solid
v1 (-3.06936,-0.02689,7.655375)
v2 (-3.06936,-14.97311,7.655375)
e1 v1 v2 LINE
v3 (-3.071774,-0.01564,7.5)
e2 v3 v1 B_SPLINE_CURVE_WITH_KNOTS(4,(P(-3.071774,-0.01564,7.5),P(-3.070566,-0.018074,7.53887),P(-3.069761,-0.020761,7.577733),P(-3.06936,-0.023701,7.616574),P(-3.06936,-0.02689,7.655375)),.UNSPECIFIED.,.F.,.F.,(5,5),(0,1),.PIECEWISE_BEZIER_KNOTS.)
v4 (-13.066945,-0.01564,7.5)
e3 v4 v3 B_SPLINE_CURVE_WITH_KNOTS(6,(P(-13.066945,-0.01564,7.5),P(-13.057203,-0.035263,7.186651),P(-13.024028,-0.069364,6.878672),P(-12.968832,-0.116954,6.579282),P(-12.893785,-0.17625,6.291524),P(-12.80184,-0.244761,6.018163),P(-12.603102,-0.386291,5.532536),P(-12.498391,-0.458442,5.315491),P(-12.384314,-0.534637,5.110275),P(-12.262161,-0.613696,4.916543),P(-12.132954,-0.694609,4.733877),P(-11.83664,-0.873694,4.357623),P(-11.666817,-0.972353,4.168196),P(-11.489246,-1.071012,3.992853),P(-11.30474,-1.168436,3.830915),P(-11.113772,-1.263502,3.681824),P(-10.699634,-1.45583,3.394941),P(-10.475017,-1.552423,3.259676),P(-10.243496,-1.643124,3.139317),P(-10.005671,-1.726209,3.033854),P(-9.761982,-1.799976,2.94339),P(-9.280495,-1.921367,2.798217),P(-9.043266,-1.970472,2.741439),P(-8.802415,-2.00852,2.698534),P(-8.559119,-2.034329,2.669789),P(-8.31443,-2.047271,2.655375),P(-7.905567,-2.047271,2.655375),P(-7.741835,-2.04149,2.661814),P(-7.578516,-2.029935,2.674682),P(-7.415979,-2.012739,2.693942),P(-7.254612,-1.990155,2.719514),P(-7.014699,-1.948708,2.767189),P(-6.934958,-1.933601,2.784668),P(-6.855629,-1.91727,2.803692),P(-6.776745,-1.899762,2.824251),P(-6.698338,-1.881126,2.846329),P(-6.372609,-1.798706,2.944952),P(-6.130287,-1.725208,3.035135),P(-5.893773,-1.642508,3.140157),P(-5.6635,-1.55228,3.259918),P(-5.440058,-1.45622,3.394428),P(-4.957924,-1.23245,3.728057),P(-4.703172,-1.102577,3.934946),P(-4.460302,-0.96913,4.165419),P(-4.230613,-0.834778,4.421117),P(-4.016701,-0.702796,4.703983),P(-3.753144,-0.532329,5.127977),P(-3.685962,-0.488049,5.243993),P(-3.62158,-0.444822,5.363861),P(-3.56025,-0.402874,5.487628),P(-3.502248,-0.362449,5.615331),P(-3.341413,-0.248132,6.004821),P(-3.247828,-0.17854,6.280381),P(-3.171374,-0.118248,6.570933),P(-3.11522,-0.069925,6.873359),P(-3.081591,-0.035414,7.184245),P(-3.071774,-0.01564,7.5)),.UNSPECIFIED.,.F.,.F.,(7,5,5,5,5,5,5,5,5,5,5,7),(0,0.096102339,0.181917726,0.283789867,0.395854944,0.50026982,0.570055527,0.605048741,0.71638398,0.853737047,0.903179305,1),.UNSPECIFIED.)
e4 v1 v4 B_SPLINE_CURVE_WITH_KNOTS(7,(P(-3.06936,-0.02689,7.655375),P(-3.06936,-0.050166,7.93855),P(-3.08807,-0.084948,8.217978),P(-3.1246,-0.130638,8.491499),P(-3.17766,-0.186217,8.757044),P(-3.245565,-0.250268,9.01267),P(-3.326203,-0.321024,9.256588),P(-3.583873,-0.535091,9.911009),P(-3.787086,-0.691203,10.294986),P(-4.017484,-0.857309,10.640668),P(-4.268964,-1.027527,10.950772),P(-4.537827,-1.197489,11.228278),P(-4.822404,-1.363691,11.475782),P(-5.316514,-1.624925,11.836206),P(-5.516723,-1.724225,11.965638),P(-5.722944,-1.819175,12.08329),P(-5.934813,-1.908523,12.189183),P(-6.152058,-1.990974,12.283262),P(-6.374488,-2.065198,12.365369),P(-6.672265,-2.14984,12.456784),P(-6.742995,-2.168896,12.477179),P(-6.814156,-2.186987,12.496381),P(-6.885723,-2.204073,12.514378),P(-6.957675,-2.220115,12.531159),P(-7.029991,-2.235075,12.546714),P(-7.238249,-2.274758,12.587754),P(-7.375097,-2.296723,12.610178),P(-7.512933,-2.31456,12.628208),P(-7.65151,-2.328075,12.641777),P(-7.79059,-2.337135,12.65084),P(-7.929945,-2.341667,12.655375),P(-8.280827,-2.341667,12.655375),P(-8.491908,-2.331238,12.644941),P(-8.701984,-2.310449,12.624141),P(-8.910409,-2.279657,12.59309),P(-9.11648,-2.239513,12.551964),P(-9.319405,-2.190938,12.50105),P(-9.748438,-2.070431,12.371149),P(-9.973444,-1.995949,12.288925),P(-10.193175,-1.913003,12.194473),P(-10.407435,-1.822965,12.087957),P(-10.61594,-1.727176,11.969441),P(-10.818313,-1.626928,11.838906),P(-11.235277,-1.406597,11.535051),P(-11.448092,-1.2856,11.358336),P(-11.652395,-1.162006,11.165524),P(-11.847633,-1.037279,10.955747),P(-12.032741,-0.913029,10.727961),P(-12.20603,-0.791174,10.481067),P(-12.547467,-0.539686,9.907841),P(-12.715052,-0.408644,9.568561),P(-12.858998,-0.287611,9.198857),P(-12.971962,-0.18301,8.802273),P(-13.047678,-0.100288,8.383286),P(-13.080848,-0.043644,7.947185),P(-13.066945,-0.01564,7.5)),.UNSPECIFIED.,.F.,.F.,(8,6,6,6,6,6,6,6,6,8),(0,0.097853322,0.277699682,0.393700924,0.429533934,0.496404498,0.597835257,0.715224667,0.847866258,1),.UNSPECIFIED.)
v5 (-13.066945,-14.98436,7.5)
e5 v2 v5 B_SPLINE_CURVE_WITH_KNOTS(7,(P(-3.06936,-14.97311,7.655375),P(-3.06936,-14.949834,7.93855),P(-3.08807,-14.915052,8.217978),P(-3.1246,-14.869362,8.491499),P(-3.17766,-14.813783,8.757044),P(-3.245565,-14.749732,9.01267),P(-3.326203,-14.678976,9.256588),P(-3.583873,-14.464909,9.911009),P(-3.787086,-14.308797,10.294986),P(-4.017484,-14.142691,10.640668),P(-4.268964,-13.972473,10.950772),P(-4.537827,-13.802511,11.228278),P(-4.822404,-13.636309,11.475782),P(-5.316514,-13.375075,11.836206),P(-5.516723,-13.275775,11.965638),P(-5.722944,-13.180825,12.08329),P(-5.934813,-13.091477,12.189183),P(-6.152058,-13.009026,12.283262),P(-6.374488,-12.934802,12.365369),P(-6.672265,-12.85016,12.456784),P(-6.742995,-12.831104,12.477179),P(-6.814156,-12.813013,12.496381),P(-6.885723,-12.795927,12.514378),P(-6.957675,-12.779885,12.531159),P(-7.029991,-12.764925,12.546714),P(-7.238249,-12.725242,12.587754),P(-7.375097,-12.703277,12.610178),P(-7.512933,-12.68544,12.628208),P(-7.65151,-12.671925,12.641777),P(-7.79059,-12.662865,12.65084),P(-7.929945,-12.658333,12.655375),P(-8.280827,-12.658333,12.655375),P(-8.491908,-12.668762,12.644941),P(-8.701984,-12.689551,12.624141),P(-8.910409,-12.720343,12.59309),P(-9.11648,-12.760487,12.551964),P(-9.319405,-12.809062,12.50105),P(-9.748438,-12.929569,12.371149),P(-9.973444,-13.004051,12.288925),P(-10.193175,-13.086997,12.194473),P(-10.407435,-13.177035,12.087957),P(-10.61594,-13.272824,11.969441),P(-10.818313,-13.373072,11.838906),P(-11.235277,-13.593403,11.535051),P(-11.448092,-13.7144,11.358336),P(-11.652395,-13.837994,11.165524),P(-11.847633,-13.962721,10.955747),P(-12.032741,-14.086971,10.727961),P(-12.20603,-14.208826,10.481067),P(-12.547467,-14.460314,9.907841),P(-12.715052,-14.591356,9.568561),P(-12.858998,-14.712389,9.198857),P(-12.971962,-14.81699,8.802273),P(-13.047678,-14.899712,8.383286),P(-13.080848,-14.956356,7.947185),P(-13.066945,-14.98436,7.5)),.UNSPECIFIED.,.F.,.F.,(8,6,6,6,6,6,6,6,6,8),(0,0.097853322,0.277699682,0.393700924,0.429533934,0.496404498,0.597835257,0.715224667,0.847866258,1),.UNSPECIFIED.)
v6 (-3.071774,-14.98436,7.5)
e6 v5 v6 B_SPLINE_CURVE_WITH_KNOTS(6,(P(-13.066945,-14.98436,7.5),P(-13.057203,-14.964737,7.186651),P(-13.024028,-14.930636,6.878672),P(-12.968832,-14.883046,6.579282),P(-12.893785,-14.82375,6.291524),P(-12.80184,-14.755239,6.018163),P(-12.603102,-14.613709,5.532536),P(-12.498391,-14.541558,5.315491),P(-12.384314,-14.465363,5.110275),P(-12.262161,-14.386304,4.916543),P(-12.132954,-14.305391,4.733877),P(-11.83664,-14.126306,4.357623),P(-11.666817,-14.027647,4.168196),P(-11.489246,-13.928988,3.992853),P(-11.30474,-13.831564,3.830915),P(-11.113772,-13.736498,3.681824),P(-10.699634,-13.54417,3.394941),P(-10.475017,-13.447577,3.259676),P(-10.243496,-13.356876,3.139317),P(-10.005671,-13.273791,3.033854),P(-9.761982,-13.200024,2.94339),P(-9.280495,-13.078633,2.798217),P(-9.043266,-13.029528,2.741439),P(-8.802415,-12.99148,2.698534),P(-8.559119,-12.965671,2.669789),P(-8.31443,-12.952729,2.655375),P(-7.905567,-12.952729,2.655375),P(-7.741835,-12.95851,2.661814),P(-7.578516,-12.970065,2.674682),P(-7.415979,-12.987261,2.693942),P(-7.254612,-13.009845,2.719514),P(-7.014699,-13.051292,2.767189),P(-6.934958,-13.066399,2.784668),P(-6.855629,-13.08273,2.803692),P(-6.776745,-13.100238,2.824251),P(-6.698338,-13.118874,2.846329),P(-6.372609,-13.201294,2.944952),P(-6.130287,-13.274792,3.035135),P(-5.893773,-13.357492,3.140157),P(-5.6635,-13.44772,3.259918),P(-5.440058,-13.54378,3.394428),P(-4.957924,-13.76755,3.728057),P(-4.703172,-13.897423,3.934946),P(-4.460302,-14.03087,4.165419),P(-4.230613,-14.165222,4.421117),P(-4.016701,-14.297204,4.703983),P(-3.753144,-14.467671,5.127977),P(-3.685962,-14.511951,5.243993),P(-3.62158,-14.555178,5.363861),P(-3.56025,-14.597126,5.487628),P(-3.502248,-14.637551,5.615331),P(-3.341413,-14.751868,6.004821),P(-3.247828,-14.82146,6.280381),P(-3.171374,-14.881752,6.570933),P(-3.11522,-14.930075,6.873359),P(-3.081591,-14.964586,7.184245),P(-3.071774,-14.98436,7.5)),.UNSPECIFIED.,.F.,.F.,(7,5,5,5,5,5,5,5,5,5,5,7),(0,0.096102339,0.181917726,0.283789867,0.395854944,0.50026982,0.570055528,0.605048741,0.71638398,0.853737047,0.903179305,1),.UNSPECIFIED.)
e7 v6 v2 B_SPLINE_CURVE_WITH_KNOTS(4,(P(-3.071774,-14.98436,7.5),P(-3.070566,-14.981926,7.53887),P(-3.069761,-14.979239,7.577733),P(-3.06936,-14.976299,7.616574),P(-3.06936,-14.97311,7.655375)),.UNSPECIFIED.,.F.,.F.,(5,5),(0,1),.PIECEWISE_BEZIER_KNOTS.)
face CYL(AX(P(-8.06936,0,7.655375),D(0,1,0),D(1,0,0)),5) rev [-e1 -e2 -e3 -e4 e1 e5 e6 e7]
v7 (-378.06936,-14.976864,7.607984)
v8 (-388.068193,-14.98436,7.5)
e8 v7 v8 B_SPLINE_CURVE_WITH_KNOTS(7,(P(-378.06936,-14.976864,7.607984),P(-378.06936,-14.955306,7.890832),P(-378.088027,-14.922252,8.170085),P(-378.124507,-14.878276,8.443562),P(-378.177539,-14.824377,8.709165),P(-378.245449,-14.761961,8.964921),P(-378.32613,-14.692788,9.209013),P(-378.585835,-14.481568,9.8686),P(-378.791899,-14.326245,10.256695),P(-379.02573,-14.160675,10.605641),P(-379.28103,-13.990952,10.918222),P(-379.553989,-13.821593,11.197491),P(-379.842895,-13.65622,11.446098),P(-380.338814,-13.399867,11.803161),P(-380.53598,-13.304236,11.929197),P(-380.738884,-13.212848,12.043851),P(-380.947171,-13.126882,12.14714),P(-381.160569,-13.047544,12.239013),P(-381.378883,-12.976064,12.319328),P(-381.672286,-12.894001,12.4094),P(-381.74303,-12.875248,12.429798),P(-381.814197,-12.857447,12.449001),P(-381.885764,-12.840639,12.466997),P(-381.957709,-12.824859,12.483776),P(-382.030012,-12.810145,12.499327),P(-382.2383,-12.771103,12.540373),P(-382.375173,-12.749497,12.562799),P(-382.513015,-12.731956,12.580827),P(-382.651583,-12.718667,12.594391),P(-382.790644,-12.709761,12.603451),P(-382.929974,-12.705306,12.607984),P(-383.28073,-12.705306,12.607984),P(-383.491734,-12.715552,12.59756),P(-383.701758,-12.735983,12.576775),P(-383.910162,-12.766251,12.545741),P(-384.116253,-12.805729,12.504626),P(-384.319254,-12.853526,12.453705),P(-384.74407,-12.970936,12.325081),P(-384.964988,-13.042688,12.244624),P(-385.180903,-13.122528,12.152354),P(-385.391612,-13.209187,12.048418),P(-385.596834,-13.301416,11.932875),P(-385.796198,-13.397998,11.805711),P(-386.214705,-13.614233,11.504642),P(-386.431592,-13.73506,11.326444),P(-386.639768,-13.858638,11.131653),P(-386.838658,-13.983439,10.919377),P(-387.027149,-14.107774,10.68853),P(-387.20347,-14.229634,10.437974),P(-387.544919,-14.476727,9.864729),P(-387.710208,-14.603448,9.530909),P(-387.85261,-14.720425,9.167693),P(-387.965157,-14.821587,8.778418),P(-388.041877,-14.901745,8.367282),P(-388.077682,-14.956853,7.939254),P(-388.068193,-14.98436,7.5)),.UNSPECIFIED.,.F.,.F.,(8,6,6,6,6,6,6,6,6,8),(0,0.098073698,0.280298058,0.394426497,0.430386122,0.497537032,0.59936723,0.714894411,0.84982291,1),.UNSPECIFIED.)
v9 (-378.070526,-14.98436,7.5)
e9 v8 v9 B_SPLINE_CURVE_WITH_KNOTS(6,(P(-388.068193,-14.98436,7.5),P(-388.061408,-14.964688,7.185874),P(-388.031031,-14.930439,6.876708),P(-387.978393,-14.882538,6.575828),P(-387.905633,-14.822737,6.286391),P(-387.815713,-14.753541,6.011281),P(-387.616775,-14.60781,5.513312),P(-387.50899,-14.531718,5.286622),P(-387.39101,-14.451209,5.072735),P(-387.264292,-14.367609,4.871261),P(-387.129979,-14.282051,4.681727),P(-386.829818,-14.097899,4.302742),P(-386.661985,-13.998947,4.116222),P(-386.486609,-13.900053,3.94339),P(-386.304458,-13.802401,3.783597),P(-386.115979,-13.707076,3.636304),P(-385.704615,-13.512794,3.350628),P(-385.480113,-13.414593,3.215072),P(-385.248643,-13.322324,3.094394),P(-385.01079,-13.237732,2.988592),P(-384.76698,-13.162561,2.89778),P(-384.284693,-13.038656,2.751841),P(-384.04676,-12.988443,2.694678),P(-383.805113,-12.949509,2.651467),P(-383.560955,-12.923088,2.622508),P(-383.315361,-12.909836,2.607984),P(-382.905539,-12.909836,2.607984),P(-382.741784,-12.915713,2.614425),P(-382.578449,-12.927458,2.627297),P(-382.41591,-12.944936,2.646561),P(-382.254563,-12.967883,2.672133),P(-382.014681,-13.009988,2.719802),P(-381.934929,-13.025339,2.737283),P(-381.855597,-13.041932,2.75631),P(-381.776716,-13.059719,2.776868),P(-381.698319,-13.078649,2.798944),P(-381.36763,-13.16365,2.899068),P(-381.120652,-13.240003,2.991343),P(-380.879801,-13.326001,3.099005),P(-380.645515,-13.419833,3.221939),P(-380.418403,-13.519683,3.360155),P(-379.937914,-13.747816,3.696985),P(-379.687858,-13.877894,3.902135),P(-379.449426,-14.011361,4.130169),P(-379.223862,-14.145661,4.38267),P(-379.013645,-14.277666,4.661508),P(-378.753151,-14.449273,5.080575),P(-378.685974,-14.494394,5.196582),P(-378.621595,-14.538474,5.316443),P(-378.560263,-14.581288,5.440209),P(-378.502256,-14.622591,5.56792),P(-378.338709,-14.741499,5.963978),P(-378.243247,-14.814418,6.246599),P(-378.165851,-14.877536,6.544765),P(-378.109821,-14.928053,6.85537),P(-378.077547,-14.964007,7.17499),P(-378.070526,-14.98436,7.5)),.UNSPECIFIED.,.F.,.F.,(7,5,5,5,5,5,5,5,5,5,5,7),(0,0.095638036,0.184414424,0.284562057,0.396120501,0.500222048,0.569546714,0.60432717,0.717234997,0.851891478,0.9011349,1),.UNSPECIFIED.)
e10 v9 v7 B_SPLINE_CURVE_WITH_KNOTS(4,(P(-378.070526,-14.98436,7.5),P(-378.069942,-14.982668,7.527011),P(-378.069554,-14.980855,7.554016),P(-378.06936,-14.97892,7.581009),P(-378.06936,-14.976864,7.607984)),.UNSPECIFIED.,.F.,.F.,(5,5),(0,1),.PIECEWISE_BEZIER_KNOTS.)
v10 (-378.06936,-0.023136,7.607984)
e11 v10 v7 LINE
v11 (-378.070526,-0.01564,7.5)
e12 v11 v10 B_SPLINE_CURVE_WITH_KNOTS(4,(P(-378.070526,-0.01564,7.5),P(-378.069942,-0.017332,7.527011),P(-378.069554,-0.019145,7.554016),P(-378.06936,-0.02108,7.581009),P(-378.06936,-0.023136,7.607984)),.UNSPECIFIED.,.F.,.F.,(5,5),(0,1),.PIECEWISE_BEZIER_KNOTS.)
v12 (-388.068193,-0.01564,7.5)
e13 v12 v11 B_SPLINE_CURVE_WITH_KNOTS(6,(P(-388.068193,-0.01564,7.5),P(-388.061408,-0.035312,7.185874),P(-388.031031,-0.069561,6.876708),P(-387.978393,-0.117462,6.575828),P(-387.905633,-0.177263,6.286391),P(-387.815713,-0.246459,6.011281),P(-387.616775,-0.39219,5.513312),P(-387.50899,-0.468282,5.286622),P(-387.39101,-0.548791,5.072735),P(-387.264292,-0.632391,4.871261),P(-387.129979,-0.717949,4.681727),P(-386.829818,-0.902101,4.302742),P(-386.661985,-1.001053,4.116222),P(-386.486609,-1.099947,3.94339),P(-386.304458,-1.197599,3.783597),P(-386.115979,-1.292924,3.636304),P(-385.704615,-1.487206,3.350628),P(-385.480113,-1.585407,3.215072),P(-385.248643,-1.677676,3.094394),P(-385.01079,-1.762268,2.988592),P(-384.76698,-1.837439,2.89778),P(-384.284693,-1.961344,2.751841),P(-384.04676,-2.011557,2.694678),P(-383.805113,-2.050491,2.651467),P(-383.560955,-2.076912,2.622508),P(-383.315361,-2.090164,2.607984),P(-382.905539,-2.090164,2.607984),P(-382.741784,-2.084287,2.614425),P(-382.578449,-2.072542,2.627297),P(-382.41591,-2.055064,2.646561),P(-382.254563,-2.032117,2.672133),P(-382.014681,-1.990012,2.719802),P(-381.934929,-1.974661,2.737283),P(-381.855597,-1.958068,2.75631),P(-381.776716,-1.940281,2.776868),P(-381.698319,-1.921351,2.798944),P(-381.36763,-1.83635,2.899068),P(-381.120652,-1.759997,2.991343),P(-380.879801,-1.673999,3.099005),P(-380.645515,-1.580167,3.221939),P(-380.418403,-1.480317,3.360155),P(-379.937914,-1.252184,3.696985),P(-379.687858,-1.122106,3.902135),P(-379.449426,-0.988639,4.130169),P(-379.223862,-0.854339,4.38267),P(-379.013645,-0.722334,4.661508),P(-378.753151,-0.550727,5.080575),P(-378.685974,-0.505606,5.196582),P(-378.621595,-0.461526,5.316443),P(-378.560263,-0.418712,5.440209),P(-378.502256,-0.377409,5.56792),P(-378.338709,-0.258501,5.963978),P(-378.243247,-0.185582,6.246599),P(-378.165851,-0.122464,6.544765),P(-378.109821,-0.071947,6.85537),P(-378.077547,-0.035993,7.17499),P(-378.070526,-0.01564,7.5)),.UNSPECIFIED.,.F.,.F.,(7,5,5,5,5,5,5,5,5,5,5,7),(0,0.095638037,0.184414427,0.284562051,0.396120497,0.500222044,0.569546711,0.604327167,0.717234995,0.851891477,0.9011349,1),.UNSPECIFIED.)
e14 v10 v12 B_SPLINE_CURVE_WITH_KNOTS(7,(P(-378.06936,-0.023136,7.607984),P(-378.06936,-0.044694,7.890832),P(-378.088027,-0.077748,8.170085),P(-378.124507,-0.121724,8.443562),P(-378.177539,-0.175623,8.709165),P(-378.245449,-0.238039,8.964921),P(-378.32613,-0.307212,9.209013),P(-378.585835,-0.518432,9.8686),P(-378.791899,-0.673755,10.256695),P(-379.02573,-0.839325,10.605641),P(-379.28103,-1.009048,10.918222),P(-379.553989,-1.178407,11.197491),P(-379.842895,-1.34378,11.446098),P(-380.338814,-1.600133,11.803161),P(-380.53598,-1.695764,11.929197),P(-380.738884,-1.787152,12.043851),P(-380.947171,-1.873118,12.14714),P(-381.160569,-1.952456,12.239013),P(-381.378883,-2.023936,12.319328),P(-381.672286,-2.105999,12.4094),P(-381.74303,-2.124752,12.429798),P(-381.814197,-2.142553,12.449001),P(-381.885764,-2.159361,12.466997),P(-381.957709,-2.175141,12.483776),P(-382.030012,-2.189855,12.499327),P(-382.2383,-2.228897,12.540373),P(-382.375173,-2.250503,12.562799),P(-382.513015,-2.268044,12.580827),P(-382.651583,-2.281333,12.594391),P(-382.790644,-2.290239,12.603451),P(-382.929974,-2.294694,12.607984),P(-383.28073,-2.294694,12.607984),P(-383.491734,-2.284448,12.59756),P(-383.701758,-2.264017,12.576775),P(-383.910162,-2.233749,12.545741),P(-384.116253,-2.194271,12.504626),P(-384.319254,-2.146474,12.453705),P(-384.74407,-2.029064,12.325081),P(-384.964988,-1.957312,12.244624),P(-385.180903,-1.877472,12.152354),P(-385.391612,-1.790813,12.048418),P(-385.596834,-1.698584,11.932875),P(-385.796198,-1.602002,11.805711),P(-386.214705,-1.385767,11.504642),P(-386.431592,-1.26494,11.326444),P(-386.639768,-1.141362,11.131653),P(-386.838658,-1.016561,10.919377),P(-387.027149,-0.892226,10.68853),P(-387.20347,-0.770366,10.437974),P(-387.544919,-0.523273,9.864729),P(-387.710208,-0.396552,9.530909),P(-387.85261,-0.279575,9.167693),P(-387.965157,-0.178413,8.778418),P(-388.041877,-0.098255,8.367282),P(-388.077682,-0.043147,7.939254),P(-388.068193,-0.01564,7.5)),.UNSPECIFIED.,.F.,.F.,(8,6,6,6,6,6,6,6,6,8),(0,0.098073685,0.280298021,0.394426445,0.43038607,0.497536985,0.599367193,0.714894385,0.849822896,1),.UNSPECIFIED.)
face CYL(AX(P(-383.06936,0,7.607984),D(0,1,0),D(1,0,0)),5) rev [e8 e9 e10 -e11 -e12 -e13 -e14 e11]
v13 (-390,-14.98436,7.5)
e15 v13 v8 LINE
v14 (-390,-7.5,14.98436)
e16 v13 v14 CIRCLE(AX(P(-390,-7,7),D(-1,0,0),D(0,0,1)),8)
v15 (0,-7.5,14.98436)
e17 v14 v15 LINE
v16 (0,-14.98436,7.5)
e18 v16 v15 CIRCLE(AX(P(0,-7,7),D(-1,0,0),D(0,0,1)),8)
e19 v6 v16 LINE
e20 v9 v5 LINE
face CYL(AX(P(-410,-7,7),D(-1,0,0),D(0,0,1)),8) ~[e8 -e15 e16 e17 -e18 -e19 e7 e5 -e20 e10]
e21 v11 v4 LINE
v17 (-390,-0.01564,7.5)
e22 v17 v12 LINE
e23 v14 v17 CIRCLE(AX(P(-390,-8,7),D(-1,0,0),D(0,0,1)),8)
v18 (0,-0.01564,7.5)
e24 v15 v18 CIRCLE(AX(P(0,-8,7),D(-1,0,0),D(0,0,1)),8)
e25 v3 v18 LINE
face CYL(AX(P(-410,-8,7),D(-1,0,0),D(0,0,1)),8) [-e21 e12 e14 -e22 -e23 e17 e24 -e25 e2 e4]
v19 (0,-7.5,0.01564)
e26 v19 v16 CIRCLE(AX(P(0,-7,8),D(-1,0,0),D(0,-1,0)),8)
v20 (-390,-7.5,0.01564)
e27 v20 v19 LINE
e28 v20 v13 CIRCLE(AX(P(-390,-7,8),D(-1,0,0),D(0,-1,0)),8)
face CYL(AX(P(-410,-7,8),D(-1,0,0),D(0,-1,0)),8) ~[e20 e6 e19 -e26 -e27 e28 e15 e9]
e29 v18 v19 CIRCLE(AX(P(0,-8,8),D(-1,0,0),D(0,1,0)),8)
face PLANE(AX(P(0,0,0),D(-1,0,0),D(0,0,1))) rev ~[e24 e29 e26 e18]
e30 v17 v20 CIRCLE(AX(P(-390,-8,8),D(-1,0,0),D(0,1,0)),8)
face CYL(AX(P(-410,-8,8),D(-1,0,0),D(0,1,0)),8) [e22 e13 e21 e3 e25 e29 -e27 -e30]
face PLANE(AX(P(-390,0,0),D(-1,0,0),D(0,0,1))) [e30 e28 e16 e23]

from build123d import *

# Parameters (mm, degrees)
F0_W        = 390
F0_H        = 15
F1_DEPTH    = 15
F2_R        = 5
F3_DEPTH    = 20
F4_T1_DEPTH = 430


# Not quite as in the source:
# - a fillet or chamfer that OpenCascade refuses, or shapes differently, is made with other operations: its cross-section is extruded or revolved along the edge and cut away or added


with BuildPart() as f1:
    # F0 (on Front) → F1 (new body)
    with BuildSketch(Plane.XZ):
        with Locations((-195, 7.5)):
            Rectangle(F0_W, F0_H)
    extrude(amount=F1_DEPTH)

    # F2 (on Front) → F3 (cut)
    with BuildSketch(Plane.XZ):
        with Locations((-383.0693596974, 7.6079843566)):
            Circle(F2_R)
        with Locations((-8.0693596974, 7.6553751715)):
            Circle(F2_R)
    extrude(amount=F3_DEPTH, mode=Mode.SUBTRACT)

    # F4: fillet of radius 8 on 4 edges, made by hand

    # F4_s2 → F4_t1 (cut)
    with BuildSketch(Plane.YZ.offset(-410)):
        with BuildLine():
            ThreePointArc((-8, 15), (-2.3431457505, 12.6568542495), (0, 7))
            Line((0, 7), (0, 15))
            Line((0, 15), (-8, 15))
        make_face()
        with BuildLine():
            ThreePointArc((0, 8), (-2.3431457505, 2.3431457505), (-8, 0))
            Line((-8, 0), (0, 0))
            Line((0, 0), (0, 8))
        make_face()
        with BuildLine():
            ThreePointArc((-7, 15), (-12.6568542495, 12.6568542495), (-15, 7))
            Line((-15, 7), (-15, 15))
            Line((-15, 15), (-7, 15))
        make_face()
        with BuildLine():
            ThreePointArc((-15, 8), (-12.6568542495, 2.3431457505), (-7, 0))
            Line((-7, 0), (-15, 0))
            Line((-15, 0), (-15, 8))
        make_face()
    extrude(amount=F4_T1_DEPTH, mode=Mode.SUBTRACT)


solid = f1.part
